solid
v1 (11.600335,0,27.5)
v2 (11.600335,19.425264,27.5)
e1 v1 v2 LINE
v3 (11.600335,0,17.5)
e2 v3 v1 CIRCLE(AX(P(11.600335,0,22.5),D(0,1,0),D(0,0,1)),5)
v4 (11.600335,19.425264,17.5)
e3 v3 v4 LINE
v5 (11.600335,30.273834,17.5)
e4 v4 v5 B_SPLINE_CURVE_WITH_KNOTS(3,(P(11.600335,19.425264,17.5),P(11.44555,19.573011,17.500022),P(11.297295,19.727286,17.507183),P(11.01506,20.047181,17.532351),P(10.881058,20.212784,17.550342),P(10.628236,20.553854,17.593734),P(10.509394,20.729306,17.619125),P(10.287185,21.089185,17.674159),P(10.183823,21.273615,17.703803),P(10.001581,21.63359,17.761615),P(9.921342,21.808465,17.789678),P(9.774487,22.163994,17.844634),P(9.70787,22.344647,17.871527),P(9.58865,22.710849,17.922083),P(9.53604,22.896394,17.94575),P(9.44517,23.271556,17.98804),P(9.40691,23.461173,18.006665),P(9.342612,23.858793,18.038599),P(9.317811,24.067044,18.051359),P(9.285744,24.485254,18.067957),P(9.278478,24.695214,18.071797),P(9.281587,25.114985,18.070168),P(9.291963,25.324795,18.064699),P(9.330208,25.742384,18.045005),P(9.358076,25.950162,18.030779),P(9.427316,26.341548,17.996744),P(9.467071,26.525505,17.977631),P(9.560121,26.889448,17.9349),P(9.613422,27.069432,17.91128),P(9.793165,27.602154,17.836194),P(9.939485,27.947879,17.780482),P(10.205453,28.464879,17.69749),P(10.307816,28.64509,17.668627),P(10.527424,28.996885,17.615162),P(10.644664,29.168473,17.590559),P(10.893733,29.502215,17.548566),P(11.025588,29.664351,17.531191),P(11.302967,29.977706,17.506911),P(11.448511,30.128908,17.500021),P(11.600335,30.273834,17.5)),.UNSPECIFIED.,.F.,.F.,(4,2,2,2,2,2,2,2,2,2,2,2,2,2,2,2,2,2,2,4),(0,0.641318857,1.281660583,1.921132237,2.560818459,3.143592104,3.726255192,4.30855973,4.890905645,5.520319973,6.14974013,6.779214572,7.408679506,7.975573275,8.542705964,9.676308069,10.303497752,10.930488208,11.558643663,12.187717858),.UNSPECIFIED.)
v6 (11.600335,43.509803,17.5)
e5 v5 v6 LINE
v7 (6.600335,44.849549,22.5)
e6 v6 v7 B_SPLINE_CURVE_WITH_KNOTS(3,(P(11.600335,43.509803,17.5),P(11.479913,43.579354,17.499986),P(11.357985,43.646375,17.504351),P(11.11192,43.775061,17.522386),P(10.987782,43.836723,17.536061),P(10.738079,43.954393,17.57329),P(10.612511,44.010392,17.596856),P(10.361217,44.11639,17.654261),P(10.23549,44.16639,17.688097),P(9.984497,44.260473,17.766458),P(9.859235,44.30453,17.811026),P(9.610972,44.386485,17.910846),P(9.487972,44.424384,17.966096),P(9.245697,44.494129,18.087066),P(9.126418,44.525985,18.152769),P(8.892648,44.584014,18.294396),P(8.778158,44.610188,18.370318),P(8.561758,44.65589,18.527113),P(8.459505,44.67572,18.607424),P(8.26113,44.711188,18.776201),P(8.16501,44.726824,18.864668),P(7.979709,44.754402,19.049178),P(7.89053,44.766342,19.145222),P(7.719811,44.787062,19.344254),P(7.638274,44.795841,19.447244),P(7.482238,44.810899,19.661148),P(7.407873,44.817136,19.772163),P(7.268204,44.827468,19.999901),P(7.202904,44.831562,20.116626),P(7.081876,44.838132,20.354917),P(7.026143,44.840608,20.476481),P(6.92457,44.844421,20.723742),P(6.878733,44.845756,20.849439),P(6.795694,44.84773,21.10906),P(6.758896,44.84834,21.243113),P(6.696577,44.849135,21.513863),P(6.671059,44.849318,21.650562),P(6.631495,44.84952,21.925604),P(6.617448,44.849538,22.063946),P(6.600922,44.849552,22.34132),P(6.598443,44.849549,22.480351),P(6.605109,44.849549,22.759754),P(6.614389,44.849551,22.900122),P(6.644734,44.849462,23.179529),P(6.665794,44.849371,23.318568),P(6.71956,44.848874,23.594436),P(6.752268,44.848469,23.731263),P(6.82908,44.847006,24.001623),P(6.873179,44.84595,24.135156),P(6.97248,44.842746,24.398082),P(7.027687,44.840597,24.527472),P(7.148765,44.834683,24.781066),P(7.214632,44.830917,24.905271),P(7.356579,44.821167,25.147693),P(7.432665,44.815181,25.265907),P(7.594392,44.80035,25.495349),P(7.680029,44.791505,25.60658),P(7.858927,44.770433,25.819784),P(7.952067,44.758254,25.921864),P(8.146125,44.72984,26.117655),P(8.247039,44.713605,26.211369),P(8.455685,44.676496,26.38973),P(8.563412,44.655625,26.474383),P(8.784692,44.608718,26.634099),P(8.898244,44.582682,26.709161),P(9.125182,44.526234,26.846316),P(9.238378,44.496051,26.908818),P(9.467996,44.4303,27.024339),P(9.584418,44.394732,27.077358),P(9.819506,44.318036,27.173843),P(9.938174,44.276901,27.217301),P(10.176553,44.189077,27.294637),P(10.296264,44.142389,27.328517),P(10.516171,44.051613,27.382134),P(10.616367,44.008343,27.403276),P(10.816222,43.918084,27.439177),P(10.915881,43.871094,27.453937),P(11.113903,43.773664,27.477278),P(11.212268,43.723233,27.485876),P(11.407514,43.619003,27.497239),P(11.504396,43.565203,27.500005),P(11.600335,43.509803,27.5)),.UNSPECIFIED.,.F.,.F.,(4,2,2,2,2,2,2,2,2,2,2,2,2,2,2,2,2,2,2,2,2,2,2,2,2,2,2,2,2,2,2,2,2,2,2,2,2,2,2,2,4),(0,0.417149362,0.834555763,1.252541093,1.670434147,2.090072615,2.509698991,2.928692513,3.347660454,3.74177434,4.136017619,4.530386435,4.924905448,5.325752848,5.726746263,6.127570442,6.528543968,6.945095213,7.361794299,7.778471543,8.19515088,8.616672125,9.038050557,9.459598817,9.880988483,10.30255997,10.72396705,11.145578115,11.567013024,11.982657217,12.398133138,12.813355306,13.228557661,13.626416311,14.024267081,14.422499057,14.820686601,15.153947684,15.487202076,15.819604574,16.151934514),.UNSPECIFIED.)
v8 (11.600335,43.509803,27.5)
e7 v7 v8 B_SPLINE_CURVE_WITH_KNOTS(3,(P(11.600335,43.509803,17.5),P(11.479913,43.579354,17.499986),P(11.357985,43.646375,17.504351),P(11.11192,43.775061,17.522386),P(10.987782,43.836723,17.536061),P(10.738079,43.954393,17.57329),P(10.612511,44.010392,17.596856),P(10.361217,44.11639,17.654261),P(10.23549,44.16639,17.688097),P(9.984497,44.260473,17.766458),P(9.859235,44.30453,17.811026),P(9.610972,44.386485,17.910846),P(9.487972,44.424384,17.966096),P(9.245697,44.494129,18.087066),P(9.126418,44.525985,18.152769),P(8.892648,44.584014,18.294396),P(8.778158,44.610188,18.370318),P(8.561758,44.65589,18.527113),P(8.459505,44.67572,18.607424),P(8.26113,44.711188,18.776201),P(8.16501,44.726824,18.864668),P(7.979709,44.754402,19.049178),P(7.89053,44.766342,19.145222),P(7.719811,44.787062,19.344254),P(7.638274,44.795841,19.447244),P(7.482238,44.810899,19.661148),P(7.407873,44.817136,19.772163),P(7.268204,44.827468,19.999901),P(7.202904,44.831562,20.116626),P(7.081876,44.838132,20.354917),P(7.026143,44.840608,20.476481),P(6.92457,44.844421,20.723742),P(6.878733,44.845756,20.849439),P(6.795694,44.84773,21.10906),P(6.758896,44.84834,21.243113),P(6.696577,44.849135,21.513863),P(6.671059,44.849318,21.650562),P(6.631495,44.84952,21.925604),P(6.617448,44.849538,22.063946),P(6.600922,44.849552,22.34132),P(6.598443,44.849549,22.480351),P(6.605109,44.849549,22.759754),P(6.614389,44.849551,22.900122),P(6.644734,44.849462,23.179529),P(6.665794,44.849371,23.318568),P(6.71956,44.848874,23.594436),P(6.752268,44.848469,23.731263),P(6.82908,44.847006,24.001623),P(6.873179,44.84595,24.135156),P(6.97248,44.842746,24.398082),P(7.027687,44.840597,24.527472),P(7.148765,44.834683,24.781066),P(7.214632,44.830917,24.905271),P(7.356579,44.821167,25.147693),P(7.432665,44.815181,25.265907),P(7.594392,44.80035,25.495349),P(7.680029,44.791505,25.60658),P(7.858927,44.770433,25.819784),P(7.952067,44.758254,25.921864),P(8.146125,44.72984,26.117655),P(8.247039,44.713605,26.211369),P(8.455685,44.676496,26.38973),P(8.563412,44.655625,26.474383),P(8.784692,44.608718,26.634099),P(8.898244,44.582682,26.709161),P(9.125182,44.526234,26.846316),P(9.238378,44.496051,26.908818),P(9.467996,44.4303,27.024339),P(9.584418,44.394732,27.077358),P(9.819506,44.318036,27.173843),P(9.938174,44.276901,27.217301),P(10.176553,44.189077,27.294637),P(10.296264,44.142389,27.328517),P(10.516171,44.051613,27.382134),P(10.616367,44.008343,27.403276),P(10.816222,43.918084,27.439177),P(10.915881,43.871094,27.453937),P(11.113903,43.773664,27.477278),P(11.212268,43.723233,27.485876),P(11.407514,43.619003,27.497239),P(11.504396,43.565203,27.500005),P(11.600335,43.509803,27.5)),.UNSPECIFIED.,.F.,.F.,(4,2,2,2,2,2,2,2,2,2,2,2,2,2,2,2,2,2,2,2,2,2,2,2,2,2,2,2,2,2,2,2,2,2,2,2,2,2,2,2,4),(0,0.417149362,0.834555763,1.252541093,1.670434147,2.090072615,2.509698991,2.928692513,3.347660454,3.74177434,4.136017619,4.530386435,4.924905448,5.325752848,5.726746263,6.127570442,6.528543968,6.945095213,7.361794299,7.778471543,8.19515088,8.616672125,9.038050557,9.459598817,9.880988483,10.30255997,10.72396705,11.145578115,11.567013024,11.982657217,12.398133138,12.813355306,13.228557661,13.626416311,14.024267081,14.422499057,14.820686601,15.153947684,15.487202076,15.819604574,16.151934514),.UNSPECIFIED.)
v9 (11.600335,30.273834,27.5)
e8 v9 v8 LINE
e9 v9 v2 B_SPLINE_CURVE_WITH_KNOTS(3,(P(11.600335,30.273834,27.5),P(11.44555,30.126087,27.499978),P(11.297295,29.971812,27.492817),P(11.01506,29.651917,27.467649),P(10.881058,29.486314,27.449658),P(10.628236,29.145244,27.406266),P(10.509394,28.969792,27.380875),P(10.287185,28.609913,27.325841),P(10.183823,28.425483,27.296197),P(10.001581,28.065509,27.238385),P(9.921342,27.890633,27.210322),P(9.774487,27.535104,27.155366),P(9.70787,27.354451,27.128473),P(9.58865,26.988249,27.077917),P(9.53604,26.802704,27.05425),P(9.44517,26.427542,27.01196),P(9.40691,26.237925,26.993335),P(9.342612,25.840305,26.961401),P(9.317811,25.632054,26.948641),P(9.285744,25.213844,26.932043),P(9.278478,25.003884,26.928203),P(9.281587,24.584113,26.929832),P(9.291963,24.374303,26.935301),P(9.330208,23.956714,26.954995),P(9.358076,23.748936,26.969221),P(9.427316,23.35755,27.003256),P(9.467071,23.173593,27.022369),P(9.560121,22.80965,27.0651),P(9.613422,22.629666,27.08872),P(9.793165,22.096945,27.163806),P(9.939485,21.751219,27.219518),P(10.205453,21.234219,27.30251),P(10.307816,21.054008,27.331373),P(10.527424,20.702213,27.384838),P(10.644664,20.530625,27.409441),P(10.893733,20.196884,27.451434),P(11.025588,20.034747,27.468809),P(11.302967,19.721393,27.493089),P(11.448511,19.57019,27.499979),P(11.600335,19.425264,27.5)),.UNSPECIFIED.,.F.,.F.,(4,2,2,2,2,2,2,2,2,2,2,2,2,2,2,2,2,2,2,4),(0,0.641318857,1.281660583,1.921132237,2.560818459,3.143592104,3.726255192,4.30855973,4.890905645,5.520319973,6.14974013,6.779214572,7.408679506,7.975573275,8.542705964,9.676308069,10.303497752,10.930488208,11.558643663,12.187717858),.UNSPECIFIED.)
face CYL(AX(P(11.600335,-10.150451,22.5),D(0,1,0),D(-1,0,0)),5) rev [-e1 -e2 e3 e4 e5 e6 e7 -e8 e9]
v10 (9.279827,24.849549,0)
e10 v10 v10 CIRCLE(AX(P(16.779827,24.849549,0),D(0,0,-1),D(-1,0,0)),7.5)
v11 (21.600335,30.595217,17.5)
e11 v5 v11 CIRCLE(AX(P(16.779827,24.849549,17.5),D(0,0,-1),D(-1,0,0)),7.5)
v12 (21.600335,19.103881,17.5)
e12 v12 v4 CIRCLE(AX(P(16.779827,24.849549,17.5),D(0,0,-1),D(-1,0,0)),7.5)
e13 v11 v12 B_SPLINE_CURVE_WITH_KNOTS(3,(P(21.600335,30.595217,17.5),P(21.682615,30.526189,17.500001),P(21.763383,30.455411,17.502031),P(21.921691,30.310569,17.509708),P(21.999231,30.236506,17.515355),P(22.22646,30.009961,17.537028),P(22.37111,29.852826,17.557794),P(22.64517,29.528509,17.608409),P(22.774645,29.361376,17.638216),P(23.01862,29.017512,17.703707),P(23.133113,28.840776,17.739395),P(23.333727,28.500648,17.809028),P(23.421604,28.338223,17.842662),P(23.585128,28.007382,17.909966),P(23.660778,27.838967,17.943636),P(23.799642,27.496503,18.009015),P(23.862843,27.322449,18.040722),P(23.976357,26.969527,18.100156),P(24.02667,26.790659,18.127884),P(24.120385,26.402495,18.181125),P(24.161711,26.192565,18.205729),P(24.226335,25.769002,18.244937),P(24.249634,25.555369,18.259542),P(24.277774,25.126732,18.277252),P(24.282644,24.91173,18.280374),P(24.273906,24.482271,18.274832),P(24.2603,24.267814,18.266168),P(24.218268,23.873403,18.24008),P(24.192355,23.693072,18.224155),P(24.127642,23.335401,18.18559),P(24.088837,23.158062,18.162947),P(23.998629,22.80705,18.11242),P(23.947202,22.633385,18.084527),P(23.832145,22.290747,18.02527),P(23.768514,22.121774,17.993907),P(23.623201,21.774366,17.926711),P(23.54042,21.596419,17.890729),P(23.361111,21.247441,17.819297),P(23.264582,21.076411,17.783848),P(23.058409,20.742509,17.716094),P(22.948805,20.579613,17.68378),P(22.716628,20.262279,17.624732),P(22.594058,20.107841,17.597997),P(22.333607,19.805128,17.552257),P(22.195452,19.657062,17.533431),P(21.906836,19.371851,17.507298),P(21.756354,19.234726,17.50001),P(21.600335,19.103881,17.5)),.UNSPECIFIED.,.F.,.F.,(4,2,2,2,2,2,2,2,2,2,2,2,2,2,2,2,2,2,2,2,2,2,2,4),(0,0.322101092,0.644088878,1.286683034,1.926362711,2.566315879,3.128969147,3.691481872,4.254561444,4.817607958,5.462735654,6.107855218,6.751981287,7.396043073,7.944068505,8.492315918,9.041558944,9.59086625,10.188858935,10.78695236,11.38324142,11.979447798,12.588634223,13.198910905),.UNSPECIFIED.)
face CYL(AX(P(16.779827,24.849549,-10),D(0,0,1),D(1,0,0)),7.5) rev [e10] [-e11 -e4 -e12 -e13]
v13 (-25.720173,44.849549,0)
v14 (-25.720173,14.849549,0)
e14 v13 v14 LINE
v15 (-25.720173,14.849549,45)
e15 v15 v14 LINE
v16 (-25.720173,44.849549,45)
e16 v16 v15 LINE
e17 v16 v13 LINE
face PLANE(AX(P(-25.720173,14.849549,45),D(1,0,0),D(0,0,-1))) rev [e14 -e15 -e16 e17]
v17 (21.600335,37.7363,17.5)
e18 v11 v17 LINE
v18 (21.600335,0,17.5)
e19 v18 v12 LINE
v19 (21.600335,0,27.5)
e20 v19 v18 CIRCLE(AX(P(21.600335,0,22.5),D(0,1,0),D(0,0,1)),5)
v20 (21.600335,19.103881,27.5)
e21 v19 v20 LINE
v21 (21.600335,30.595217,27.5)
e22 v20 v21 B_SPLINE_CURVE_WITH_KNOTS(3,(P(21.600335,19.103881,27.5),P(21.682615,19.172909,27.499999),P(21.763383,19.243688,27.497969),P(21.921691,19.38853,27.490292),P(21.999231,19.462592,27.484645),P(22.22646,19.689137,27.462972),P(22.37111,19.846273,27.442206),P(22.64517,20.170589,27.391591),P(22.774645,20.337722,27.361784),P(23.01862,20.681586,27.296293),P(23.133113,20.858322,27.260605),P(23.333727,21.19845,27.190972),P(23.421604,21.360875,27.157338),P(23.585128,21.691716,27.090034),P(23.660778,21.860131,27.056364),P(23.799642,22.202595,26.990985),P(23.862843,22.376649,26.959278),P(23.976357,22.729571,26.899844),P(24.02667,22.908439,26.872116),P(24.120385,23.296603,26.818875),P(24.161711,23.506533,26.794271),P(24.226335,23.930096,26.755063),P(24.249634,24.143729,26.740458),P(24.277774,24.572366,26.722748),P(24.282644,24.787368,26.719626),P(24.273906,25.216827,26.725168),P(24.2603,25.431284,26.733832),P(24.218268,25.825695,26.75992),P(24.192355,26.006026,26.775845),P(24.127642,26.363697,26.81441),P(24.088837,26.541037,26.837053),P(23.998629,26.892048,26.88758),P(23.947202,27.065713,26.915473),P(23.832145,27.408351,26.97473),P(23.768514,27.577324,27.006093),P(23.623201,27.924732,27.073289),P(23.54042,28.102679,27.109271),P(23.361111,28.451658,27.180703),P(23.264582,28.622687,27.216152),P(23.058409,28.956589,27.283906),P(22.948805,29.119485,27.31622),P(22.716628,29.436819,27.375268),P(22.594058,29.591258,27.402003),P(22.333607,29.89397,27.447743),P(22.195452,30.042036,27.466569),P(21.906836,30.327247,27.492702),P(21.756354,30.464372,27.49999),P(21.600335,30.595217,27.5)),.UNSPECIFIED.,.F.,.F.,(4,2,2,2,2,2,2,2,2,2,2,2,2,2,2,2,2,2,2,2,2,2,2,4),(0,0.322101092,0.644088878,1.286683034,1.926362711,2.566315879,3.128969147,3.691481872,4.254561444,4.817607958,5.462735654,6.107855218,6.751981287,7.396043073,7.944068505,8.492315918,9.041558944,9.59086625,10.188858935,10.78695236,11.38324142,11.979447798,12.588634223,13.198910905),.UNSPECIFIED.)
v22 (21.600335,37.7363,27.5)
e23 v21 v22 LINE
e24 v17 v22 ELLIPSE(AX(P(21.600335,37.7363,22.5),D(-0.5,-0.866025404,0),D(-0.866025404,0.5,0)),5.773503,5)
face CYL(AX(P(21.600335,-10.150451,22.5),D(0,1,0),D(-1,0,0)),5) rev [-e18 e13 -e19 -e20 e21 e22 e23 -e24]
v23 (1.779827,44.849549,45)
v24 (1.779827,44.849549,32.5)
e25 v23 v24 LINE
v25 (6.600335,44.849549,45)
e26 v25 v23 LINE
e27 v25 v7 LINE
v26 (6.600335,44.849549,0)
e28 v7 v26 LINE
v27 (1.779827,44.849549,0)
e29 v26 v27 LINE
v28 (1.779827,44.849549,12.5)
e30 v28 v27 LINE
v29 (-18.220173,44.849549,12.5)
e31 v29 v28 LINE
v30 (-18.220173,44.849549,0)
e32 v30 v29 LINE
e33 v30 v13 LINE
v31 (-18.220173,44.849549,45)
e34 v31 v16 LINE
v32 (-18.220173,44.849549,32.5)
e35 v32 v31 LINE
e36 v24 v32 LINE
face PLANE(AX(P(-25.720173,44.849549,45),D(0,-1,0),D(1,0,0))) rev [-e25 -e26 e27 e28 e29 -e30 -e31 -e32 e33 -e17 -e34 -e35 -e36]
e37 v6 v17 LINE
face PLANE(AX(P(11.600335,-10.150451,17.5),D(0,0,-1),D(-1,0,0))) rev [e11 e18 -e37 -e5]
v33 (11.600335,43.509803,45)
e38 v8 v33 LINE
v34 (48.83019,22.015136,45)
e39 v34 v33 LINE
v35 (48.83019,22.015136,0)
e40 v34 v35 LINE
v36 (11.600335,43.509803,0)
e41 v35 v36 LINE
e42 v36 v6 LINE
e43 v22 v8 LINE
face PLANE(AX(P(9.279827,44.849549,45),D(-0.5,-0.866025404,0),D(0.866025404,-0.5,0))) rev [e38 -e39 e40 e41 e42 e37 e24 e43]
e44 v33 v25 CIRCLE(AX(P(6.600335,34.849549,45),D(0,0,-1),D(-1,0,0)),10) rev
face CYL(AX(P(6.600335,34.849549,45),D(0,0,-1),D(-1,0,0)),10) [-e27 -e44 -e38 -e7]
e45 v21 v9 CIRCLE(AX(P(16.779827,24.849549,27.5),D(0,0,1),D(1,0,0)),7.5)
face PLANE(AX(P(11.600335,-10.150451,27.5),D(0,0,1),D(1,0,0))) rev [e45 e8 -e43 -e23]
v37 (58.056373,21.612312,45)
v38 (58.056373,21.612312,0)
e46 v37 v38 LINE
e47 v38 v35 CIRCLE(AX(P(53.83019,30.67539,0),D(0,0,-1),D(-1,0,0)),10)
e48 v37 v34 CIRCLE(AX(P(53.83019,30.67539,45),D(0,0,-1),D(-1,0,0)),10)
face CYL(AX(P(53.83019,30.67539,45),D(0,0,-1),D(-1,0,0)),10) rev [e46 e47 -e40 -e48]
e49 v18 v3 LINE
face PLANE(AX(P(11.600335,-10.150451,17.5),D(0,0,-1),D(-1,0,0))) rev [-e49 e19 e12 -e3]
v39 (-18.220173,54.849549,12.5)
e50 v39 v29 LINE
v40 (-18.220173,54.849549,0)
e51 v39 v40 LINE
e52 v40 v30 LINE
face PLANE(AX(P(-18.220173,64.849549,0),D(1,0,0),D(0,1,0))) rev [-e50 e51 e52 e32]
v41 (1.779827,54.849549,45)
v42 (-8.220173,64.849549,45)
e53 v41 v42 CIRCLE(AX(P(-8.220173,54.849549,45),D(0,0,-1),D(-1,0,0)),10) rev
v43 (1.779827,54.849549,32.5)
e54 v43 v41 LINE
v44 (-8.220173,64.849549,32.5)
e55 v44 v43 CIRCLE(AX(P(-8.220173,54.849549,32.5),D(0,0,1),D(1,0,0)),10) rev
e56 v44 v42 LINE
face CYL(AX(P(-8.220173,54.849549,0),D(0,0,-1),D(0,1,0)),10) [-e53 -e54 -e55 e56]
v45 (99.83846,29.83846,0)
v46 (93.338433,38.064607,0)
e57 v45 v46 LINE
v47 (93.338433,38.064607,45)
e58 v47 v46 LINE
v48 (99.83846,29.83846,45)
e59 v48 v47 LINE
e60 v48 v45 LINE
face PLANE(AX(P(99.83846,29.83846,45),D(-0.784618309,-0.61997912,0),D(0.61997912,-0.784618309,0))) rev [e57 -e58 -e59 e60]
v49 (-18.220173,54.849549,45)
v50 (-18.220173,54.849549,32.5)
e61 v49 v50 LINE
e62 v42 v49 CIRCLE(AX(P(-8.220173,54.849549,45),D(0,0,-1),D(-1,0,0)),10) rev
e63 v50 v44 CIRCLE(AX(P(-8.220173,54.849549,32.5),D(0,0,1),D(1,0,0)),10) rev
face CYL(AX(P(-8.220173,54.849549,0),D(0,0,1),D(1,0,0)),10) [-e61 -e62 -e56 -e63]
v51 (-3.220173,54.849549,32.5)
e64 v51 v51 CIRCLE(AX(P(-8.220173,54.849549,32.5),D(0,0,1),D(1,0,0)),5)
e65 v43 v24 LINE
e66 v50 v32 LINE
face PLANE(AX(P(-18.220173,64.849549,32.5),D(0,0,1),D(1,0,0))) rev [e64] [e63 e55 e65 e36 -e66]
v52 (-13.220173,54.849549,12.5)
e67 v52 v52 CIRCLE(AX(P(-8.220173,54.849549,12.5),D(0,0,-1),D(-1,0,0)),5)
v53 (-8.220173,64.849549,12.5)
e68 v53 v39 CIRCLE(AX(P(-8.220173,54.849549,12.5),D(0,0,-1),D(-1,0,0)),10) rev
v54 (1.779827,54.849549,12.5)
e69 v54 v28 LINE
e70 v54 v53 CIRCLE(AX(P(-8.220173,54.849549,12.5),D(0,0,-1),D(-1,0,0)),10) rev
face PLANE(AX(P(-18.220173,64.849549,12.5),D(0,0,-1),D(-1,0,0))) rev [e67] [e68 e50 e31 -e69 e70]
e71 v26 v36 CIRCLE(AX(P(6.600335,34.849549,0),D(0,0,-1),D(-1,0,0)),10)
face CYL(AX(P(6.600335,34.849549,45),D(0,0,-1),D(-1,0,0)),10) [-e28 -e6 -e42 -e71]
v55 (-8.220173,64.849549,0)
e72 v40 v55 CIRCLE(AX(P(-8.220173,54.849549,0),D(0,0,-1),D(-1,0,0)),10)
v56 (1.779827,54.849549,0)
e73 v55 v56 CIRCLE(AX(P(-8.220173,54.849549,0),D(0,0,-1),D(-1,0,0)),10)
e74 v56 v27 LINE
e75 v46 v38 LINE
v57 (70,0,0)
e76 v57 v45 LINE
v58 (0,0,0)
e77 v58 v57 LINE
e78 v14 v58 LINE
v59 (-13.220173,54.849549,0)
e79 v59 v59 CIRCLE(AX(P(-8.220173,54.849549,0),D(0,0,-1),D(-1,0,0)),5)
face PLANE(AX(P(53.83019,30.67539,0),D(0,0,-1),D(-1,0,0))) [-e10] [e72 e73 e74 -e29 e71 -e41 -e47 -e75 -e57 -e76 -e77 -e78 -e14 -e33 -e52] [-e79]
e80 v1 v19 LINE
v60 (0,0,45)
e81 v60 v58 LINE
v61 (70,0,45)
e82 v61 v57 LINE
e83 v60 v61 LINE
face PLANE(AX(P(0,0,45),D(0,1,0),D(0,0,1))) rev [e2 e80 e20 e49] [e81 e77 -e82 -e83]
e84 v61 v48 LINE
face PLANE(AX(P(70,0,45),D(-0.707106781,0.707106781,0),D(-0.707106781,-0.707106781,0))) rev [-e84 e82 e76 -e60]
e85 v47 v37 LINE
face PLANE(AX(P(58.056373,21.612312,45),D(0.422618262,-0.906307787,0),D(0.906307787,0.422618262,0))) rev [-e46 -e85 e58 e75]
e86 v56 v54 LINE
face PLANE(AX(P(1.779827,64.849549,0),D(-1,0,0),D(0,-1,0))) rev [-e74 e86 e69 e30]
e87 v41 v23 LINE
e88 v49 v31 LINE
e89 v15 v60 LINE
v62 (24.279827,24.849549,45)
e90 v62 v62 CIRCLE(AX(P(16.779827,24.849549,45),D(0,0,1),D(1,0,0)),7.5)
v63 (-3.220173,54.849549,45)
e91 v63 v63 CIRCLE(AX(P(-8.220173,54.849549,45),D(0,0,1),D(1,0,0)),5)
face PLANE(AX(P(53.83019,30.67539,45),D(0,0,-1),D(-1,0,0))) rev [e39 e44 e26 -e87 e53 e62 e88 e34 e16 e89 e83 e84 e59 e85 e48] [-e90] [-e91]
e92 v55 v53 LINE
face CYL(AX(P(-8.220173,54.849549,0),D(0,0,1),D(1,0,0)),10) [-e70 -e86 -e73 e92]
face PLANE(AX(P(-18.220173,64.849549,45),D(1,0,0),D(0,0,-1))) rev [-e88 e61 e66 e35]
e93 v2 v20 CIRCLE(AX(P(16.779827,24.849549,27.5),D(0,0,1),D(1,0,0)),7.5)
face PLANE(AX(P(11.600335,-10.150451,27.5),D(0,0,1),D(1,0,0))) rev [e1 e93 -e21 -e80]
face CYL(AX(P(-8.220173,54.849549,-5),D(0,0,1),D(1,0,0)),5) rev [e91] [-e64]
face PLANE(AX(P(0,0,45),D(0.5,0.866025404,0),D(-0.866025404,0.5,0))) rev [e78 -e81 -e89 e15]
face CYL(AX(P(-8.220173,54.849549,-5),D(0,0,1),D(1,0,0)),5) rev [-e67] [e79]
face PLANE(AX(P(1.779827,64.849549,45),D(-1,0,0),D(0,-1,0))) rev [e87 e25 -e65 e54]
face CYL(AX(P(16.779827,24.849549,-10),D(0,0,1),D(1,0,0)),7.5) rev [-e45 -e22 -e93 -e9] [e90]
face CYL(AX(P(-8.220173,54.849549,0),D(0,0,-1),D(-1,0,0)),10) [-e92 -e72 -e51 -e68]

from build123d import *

# Parameters (mm, degrees)
BOSS_EXTRUDE1_DEPTH = 45
SKETCH2_W           = 20
SKETCH2_H           = 12.5
BOSS_EXTRUDE2_DEPTH = 20
FILLET1_R           = 10
FILLET2_R           = 10
SKETCH3_R           = 5
CUT_EXTRUDE1_DEPTH  = 50
CUT_EXTRUDE2_DEPTH  = 55
SKETCH5_R           = 7.5
CUT_EXTRUDE3_DEPTH  = 55


with BuildPart() as part:
    # Sketch1 → Boss-Extrude1 (new body)
    with BuildSketch(Plane.XY):
        with BuildLine():
            Line((0, 0), (70, 0))
            Line((70, 0), (99.838459525, 29.838459525))
            Line((99.838459525, 29.838459525), (93.338433206, 38.064606978))
            Line((93.338433206, 38.064606978), (58.056372922, 21.612312072))
            ThreePointArc((58.056372922, 21.612312072), (53.393996431, 20.684907727), (48.830190304, 22.015135905))
            Line((48.830190304, 22.015135905), (9.27982655, 44.849549065))
            Line((9.27982655, 44.849549065), (-25.72017345, 44.849549065))
            Line((-25.72017345, 44.849549065), (-25.72017345, 14.849549065))
            Line((-25.72017345, 14.849549065), (0, 0))
        make_face()
    extrude(amount=BOSS_EXTRUDE1_DEPTH)

    # Sketch2 → Boss-Extrude2 (add)
    with BuildSketch(Plane(origin=(0, 44.849549065, 0), x_dir=(1, 0, 0), z_dir=(0, 1, 0))):
        with Locations((-8.22017345, -6.25)):
            Rectangle(SKETCH2_W, SKETCH2_H)
        with Locations((-8.22017345, -38.75)):
            Rectangle(SKETCH2_W, SKETCH2_H)
    extrude(amount=BOSS_EXTRUDE2_DEPTH)

    # Fillet1
    fillet1_edges = [part.edges().sort_by_distance(p)[0] for p in [
        (1.77982655, 64.849549065, 38.75),
        (-18.22017345, 64.849549065, 38.75),
        (1.77982655, 64.849549065, 6.25),
        (-18.22017345, 64.849549065, 6.25),
    ]]
    fillet(fillet1_edges, radius=FILLET1_R - 0.0001)  # a hair under: the kernel refuses the full size

    # Fillet2
    fillet2_edges = [part.edges().sort_by_distance(p)[0] for p in [
        (9.27982655, 44.849549065, 22.5),
    ]]
    fillet(fillet2_edges, radius=FILLET2_R)

    # Sketch3 → Cut-Extrude1 (cut)
    with BuildSketch(Plane.XY.offset(45)):
        with Locations((-8.22017345, 54.849549065)):
            Circle(SKETCH3_R)
    extrude(amount=-CUT_EXTRUDE1_DEPTH, mode=Mode.SUBTRACT)

    # Sketch4 → Cut-Extrude2 (cut)
    with BuildSketch(Plane(origin=(0, 44.849549065, 0), x_dir=(1, 0, 0), z_dir=(0, 1, 0))):
        with BuildLine():
            Line((11.600334626, -17.5), (21.600334626, -17.5))
            ThreePointArc((21.600334626, -17.5), (26.600334626, -22.5), (21.600334626, -27.5))
            Line((21.600334626, -27.5), (11.600334626, -27.5))
            ThreePointArc((11.600334626, -27.5), (6.600334626, -22.5), (11.600334626, -17.5))
        make_face()
    extrude(amount=-CUT_EXTRUDE2_DEPTH, mode=Mode.SUBTRACT)

    # Sketch5 → Cut-Extrude3 (cut)
    with BuildSketch(Plane.XY.offset(45)):
        with Locations((16.77982655, 24.849549065)):
            Circle(SKETCH5_R)
    extrude(amount=-CUT_EXTRUDE3_DEPTH, mode=Mode.SUBTRACT)


solid = part.part
